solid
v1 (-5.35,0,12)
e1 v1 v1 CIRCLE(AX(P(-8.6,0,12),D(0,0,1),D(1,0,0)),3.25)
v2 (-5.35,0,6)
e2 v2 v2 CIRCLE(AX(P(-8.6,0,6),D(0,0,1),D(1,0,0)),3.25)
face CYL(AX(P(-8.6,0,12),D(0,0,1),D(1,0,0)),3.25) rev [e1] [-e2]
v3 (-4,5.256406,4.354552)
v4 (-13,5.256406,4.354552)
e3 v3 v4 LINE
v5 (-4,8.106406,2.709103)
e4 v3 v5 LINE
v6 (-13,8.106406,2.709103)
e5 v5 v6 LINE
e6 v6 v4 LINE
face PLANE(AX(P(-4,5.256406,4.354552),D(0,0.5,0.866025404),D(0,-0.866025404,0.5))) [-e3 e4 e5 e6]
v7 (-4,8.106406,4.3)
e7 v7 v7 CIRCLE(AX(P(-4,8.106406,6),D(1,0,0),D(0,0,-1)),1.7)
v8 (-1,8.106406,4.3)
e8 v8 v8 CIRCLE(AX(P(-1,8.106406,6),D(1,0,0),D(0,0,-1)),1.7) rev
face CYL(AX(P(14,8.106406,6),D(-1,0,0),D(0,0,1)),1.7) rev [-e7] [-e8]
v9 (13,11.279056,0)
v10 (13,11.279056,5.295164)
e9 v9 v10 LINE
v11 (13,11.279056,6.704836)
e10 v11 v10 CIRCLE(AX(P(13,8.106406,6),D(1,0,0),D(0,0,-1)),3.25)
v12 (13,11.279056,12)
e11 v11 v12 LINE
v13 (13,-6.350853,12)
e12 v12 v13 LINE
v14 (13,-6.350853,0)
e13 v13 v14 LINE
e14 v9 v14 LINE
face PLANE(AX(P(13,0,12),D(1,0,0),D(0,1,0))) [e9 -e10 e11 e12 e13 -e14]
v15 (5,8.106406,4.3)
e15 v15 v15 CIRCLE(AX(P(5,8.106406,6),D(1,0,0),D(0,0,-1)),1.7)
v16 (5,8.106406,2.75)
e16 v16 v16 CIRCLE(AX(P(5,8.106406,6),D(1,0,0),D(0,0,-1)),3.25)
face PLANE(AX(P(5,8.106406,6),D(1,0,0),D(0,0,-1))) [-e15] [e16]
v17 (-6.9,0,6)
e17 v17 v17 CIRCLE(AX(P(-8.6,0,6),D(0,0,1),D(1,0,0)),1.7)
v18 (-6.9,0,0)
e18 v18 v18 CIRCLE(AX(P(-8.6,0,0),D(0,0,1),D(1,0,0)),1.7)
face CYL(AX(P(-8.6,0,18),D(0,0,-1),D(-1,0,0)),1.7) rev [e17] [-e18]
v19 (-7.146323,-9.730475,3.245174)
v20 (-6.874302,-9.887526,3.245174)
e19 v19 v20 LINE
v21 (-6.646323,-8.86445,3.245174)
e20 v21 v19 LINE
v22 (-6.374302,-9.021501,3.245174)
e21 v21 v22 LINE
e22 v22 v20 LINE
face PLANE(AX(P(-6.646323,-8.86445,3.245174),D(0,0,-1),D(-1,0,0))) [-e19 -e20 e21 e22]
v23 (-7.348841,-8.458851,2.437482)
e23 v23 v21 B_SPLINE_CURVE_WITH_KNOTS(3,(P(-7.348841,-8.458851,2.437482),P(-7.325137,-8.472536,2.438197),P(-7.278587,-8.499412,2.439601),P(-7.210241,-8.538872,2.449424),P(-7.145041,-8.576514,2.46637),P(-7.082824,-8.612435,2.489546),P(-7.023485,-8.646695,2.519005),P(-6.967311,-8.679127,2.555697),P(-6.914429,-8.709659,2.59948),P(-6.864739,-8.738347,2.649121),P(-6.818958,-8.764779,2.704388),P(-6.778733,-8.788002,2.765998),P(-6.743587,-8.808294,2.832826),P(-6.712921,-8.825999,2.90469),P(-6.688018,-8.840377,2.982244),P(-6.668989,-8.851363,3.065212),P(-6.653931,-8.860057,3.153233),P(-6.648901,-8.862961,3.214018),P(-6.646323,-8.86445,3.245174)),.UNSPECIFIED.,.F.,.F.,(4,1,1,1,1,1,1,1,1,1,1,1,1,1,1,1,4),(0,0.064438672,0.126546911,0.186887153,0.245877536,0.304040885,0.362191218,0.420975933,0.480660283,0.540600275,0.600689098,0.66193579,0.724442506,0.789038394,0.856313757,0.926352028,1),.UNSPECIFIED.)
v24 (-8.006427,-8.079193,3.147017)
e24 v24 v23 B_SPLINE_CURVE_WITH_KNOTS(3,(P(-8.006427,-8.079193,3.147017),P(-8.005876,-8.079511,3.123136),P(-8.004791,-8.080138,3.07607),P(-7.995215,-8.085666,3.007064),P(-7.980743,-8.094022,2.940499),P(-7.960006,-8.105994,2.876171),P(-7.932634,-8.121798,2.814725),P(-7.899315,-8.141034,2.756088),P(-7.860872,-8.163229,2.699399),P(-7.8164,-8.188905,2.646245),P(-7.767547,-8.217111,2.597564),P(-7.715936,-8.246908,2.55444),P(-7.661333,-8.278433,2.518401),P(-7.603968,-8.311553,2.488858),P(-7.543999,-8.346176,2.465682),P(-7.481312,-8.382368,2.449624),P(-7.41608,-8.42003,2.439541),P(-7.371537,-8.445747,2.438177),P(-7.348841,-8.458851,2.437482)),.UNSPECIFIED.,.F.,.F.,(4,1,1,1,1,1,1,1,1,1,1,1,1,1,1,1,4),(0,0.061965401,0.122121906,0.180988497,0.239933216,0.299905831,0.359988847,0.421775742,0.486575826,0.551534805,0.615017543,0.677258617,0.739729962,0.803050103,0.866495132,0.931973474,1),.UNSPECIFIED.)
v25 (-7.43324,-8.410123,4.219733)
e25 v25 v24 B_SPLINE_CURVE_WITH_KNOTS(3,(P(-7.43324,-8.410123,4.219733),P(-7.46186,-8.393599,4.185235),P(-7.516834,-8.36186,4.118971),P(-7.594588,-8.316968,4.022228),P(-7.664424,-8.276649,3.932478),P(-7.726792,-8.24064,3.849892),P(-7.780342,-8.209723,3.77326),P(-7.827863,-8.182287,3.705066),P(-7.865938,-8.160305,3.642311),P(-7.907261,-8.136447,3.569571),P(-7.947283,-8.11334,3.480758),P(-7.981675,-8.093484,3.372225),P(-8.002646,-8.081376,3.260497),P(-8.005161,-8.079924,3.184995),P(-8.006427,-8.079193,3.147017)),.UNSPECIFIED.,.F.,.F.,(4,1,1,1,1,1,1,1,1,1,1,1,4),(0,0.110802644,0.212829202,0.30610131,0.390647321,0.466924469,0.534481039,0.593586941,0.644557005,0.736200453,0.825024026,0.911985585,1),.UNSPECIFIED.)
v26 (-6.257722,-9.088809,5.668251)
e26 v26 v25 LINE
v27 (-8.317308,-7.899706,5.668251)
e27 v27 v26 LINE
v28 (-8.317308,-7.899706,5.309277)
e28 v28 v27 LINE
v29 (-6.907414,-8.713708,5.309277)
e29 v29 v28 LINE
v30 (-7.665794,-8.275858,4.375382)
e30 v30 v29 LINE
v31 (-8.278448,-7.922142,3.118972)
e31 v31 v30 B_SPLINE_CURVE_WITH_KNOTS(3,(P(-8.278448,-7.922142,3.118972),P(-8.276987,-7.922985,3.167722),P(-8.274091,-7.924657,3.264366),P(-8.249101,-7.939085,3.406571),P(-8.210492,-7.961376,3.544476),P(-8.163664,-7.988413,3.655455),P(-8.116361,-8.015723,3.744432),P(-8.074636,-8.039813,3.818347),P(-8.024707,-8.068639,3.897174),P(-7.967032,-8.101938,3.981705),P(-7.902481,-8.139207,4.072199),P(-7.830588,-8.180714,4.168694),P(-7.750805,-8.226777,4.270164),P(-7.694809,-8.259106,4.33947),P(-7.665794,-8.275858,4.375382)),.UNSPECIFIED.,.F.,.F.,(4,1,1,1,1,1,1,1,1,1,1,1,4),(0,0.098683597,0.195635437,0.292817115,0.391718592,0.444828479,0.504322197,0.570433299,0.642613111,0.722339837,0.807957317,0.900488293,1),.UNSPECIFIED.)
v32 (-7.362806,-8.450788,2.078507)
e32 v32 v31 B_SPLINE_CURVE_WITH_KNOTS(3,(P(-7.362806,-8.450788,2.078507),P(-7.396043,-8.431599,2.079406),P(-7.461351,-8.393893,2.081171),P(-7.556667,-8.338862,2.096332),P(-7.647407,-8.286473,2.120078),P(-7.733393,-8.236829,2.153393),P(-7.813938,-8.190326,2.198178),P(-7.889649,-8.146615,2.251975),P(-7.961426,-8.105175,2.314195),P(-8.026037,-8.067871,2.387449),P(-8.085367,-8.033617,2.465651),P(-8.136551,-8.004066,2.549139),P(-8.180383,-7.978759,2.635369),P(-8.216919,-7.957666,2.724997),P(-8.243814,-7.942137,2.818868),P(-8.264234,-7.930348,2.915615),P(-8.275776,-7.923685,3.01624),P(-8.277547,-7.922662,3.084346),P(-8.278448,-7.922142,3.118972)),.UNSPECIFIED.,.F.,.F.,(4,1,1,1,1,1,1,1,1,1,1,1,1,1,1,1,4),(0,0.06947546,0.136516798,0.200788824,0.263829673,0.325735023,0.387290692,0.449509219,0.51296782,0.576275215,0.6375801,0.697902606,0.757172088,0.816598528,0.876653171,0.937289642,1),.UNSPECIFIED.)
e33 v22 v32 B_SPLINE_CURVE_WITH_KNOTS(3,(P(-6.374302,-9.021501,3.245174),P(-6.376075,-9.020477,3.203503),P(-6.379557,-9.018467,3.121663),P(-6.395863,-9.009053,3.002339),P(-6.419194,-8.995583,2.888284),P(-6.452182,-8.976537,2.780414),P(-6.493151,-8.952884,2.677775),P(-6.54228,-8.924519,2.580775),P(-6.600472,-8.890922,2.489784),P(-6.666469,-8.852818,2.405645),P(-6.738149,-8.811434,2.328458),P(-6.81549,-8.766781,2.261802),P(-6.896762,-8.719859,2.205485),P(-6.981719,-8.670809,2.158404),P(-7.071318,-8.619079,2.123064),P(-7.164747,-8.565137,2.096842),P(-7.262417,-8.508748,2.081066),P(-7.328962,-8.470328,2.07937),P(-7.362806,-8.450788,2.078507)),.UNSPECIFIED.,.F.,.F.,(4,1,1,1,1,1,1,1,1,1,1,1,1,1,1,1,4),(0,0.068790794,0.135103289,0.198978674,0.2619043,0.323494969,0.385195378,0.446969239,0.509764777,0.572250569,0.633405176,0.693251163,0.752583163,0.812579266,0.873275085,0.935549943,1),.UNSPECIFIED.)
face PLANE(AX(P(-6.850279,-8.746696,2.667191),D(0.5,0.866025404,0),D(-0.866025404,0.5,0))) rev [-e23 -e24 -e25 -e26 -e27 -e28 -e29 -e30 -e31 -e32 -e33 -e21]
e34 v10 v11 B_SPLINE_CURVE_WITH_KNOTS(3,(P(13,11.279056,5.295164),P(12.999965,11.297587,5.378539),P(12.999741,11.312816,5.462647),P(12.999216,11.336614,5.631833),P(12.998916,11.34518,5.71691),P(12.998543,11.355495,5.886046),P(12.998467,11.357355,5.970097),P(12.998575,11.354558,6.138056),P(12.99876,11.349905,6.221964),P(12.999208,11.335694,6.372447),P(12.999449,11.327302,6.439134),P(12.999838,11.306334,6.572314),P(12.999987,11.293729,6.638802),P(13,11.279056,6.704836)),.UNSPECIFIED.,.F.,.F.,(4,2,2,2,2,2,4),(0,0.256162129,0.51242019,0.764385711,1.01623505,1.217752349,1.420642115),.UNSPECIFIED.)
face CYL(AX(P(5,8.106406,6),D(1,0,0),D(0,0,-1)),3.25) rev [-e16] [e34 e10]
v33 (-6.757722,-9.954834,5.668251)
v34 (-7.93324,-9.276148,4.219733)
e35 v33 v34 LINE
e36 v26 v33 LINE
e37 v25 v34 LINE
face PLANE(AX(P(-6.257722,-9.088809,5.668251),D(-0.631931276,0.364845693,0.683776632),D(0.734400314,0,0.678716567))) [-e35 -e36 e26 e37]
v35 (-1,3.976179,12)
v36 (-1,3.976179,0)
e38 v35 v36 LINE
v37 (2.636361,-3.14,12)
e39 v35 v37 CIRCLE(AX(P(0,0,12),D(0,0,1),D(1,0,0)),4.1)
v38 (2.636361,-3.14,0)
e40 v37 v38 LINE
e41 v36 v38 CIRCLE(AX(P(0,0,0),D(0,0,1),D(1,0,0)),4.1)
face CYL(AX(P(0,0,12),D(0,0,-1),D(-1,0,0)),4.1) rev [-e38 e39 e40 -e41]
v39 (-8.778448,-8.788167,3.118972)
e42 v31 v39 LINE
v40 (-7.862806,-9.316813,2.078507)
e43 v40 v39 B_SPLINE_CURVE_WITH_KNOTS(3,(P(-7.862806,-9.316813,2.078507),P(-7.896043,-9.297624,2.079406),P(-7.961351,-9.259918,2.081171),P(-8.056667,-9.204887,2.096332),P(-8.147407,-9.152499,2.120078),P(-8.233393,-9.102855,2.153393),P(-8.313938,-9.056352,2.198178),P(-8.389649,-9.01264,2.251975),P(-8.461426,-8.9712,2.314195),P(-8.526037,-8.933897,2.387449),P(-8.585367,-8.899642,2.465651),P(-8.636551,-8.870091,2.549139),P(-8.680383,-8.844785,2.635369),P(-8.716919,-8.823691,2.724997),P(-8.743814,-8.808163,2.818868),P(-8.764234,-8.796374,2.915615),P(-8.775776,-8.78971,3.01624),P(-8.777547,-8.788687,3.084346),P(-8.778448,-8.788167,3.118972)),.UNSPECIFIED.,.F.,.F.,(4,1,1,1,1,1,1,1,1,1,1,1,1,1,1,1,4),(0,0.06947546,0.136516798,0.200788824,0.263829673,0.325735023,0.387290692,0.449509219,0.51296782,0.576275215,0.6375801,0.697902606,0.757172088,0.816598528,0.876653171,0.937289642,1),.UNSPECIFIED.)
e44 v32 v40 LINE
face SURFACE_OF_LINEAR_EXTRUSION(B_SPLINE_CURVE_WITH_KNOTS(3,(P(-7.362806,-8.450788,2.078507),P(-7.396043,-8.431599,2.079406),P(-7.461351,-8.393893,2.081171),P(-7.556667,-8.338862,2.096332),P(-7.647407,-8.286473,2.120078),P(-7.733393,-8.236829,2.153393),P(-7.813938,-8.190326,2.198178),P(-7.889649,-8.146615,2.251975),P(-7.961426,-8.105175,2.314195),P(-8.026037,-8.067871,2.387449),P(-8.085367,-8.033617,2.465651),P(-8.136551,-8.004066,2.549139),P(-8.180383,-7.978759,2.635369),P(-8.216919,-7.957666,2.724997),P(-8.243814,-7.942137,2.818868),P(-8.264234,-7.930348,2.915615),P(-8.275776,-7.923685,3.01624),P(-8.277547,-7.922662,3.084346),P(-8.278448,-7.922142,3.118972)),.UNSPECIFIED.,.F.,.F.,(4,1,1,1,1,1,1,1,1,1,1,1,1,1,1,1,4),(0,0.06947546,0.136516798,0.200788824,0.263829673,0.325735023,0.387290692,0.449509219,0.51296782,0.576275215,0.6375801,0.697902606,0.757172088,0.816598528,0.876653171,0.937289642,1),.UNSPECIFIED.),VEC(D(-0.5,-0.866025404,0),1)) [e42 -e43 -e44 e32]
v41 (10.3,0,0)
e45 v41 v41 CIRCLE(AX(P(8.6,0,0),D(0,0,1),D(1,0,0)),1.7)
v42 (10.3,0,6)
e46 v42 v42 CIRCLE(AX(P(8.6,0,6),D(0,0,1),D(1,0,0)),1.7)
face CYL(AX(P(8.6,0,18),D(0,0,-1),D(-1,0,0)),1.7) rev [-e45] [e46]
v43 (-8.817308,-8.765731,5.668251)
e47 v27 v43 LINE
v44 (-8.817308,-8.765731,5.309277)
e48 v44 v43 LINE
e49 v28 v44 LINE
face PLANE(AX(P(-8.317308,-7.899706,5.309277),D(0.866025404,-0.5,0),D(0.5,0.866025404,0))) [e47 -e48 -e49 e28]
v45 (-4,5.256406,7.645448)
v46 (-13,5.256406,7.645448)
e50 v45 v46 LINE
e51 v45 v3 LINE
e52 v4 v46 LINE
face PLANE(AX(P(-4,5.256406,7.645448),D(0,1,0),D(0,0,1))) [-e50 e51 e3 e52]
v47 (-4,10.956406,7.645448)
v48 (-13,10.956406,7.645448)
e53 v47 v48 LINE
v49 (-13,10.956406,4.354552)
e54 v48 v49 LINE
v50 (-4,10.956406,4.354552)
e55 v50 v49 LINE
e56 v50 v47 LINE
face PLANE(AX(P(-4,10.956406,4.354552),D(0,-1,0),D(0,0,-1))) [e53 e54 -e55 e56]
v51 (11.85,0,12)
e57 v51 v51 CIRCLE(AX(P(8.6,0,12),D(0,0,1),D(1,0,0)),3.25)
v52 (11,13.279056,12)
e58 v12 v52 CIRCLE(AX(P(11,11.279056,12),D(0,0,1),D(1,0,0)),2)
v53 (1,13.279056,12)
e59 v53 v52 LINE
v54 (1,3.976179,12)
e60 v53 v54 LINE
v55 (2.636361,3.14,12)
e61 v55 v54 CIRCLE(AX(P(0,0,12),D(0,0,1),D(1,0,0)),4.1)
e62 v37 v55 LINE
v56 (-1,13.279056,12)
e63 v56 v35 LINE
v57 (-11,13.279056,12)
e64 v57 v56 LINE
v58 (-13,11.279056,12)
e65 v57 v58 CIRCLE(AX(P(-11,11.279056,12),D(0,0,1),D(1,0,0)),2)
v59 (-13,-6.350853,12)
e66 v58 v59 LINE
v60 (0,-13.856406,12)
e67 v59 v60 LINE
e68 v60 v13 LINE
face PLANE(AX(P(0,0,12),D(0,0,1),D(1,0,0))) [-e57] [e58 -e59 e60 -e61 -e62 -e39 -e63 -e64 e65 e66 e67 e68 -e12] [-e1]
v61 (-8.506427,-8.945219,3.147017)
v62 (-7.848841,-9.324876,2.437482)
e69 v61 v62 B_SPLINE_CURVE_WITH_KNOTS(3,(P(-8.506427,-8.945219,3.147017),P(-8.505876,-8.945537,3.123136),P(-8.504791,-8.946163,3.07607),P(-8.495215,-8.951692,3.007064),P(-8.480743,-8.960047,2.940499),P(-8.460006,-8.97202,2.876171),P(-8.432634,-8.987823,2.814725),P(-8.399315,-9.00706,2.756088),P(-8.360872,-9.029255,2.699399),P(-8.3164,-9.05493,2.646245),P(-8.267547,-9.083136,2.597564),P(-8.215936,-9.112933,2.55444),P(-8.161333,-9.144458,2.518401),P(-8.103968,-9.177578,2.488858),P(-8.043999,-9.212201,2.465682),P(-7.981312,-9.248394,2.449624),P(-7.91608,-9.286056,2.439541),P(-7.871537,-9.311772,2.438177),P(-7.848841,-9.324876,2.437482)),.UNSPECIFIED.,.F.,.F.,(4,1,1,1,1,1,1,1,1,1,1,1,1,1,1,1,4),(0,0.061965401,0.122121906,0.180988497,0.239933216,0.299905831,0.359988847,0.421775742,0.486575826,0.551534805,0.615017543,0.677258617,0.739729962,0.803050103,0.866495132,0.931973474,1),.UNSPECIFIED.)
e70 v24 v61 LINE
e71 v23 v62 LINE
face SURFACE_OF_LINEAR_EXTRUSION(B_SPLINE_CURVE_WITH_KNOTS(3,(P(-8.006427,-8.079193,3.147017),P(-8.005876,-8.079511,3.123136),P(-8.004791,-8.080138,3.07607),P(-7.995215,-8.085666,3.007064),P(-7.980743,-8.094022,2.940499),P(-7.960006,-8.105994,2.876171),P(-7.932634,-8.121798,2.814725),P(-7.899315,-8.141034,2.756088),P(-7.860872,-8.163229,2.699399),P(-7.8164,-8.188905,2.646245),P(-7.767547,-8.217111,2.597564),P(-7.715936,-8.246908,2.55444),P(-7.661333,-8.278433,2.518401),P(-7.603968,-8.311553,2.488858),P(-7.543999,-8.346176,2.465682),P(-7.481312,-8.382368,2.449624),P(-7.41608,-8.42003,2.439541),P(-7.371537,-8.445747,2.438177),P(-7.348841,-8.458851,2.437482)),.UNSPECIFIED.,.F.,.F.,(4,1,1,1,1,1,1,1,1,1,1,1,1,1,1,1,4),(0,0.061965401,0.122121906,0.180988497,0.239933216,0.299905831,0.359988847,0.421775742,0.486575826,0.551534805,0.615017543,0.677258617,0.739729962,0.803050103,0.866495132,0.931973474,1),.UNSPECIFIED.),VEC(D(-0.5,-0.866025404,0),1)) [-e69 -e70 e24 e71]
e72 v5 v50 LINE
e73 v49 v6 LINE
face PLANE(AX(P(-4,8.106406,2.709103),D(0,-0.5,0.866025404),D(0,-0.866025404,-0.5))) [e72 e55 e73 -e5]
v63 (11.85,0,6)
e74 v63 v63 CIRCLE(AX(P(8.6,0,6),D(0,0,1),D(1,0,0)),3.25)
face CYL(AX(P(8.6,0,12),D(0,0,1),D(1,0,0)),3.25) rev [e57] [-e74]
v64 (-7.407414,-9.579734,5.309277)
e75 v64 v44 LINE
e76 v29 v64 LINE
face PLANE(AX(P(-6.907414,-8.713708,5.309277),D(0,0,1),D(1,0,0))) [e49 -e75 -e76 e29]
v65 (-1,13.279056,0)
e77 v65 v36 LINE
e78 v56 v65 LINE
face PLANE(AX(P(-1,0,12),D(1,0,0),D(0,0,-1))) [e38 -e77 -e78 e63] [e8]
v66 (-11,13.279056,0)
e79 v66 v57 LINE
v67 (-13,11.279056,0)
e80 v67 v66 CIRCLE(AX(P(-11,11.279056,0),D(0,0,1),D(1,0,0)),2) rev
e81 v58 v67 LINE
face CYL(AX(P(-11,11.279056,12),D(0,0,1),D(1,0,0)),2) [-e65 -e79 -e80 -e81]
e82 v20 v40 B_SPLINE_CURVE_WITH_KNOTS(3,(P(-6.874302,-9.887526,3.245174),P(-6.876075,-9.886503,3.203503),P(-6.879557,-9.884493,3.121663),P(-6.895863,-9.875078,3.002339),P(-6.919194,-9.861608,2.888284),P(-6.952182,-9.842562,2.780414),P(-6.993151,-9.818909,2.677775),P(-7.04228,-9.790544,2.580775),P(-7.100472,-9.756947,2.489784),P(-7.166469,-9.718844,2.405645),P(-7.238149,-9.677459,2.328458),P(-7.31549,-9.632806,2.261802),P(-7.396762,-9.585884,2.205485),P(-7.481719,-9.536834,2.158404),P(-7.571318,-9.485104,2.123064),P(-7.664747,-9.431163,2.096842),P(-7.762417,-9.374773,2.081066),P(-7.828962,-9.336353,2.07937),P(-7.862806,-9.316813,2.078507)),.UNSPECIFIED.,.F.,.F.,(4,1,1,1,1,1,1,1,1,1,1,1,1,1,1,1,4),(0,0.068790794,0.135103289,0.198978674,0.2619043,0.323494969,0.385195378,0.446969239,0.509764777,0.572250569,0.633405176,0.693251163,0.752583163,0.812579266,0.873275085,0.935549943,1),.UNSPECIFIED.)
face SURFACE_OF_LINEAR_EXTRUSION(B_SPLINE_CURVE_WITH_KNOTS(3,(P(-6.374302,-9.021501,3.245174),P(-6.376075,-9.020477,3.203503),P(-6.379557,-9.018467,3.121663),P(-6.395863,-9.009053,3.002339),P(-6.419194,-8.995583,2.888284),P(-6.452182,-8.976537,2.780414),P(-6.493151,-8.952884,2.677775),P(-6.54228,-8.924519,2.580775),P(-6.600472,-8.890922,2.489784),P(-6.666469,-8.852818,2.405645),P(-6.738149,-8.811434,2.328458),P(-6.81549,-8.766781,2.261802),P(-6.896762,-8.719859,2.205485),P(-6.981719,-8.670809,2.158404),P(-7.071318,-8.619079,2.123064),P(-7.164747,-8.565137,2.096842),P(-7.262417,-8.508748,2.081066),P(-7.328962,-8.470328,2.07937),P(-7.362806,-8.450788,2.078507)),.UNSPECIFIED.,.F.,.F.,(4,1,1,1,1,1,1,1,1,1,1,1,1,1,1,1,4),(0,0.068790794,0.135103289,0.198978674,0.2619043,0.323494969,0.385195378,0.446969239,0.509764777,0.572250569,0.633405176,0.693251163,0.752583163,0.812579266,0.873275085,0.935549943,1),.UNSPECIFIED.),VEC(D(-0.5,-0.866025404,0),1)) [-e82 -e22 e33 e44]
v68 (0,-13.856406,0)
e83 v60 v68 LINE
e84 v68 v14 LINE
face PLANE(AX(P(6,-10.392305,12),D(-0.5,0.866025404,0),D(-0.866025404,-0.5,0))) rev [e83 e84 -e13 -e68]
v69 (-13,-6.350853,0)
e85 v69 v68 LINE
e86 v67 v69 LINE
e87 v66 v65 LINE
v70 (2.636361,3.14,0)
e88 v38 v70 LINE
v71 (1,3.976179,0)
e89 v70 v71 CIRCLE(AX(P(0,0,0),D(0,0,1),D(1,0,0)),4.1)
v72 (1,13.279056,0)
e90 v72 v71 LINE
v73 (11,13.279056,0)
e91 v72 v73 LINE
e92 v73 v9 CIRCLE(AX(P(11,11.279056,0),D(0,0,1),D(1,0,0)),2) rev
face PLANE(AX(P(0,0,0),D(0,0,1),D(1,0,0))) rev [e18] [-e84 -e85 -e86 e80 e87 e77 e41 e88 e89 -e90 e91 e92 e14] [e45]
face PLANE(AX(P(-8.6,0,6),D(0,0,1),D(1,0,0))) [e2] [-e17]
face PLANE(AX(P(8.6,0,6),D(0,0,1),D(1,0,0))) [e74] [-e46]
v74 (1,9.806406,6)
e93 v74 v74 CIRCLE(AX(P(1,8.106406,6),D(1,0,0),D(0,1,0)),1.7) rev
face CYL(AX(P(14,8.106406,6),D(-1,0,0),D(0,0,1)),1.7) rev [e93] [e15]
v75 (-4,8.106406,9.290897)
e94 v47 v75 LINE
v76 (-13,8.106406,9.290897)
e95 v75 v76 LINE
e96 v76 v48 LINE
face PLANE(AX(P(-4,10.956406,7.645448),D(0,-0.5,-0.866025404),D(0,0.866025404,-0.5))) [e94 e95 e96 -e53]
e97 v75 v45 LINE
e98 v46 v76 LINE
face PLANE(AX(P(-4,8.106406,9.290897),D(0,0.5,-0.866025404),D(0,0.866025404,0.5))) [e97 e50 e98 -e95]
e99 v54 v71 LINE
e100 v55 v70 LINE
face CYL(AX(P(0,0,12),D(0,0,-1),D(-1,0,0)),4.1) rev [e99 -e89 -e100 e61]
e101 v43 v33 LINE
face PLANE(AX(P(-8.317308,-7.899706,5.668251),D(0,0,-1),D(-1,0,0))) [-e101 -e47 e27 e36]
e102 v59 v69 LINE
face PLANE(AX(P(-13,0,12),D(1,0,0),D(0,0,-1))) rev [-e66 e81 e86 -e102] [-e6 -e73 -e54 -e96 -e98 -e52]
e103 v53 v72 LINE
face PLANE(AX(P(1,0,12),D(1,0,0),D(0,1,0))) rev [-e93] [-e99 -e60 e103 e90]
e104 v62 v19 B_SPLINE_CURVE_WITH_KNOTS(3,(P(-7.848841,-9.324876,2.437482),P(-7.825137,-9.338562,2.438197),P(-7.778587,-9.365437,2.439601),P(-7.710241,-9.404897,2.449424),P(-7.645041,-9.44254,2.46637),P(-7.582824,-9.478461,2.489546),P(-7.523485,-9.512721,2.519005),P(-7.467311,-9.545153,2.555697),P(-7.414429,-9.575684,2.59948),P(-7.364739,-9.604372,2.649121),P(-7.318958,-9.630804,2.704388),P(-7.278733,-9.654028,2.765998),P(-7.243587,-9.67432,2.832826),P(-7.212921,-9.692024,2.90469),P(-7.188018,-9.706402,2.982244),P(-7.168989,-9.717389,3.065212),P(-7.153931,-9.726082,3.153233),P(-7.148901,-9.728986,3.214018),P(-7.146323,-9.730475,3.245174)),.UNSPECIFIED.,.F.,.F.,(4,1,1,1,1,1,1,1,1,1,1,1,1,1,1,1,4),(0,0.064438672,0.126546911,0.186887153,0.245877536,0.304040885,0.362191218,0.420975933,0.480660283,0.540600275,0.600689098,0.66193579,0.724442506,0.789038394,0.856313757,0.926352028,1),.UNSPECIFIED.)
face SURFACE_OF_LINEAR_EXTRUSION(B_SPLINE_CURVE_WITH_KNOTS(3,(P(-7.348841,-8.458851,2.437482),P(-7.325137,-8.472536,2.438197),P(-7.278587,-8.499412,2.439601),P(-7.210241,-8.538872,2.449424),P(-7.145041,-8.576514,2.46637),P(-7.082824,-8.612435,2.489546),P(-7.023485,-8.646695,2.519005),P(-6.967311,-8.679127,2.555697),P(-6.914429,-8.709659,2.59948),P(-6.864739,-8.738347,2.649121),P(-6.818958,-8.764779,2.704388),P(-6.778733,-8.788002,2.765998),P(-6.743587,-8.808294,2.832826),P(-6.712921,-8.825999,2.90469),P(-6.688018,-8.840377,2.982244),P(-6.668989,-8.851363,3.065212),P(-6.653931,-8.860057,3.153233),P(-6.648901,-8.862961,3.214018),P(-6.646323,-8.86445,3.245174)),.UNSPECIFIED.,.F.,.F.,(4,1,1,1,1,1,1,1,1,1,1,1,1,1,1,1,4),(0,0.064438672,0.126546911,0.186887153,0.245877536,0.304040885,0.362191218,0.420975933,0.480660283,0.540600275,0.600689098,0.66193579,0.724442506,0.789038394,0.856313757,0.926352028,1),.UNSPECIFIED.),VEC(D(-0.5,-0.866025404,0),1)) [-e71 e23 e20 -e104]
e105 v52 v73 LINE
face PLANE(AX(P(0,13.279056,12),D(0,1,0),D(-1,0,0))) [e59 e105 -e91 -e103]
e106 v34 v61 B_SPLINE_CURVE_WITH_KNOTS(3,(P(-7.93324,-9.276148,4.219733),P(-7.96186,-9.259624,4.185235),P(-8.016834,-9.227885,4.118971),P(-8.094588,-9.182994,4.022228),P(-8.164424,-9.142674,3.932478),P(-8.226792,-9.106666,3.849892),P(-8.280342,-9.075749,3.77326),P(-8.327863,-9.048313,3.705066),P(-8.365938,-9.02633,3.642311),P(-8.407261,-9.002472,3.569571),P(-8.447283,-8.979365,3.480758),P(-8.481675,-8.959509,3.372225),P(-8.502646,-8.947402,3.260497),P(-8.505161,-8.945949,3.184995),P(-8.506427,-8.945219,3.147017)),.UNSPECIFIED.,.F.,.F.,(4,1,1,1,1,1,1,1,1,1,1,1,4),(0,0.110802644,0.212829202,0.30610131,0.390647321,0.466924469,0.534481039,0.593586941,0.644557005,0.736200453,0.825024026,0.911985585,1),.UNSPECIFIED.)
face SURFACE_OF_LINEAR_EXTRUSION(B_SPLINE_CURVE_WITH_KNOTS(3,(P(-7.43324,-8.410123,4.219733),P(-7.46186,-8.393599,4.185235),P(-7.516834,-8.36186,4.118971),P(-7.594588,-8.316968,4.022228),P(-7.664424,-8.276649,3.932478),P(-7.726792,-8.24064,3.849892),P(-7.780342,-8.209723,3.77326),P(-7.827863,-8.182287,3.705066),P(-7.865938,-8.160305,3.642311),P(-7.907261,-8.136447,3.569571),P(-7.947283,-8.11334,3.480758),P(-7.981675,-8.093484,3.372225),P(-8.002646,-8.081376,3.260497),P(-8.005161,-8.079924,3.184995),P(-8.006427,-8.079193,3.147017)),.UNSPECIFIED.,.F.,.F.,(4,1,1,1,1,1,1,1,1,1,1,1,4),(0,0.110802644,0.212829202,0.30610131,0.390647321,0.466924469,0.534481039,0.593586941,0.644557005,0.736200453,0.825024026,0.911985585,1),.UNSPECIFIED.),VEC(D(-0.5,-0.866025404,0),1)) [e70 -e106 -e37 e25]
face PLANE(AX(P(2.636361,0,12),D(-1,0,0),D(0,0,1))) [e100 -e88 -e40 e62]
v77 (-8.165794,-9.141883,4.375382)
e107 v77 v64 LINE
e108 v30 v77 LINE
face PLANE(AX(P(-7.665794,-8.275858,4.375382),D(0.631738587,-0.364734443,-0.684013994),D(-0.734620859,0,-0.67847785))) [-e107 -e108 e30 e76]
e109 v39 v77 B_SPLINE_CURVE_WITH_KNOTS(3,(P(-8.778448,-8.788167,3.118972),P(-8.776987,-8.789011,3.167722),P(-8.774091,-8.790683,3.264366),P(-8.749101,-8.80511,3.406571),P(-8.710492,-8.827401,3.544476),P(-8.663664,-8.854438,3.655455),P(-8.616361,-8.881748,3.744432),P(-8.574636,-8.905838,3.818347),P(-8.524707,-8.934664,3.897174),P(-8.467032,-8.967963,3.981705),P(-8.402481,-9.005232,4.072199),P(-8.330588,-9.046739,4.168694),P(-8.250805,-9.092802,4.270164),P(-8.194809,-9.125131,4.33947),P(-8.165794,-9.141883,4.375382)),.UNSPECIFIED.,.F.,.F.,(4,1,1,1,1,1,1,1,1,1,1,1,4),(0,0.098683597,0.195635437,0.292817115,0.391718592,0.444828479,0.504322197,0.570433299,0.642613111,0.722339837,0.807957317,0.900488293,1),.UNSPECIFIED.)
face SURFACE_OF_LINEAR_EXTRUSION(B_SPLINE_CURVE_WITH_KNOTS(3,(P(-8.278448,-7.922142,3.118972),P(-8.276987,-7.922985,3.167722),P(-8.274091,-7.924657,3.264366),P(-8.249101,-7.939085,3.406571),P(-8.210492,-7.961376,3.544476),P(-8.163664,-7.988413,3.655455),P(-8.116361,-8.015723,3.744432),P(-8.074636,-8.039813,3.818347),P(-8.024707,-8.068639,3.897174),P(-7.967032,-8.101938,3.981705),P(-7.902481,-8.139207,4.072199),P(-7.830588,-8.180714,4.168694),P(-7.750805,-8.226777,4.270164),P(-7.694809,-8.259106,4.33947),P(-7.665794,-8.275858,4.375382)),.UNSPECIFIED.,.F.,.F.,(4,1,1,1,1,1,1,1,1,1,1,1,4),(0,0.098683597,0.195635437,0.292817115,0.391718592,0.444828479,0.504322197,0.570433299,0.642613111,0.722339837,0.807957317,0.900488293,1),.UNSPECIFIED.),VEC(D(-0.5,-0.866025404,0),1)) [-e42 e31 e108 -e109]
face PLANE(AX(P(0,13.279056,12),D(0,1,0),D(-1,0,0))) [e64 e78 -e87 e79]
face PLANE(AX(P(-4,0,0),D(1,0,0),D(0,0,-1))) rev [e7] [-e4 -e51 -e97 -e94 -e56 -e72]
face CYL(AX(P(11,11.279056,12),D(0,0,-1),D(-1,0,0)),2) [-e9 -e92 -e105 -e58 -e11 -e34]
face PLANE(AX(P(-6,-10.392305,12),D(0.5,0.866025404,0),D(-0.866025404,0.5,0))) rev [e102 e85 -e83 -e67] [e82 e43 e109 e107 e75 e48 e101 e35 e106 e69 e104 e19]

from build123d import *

# Parameters (mm, degrees)
BOSS_EXTRUDE1_DEPTH            = 12
SKETCH41_R                     = 1.7
CUT_EXTRUDE7_DEPTH             = 18
CBORE_FOR_M3_SHCS1_D           = 3.4
CBORE_FOR_M3_SHCS1_CBORE_D     = 6.5
CBORE_FOR_M3_SHCS1_CBORE_DEPTH = 3
F_3DSKETCH3_START              = 9
F_3DSKETCH3_OUTLINE_R          = 3.25
F_3DSKETCH3_OUTLINE_R_2        = 1.7
F_3DSKETCH3_DEPTH              = 3
CUT_EXTRUDE10_DEPTH            = 15
CUT_EXTRUDE10_DEPTH_BACK       = 15
SKETCH52_R                     = 1.7
SKETCH58_R                     = 3.25
CUT_EXTRUDE11_DEPTH            = 8
CUT_EXTRUDE12_DEPTH            = 4
CUT_EXTRUDE12_DEPTH_BACK       = 6
FILLET1_R                      = 2
SKETCH61_R                     = 3.25
CUT_EXTRUDE13_DEPTH            = 6
CUT_EXTRUDE14_DEPTH            = 1


# Read off the part's stored shape, not the designer's step: 3DSketch3
with BuildPart() as part:
    # Sketch1 → Boss-Extrude1 (new body)
    with BuildSketch(Plane(origin=(0, 0, 0), x_dir=(0, 1, 0), z_dir=(0, 0, 1))):
        with BuildLine():
            Line((-6.350852961, -13), (13.279056191, -13))
            Line((13.279056191, -13), (13.279056191, -1))
            Line((13.279056191, -1), (3.97617907, -1))
            ThreePointArc((3.97617907, -1), (3.650947901, -1.865631106), (3.14, -2.636361129))
            Line((3.14, -2.636361129), (-3.14, -2.636361129))
            ThreePointArc((-3.14, -2.636361129), (-3.852531635, -1.402854233), (-4.1, 0))
            ThreePointArc((-4.1, 0), (-0.503818326, 4.06892702), (3.97617907, 1))
            Line((3.97617907, 1), (13.279056191, 1))
            Line((13.279056191, 1), (13.279056191, 13))
            Line((13.279056191, 13), (-6.350852961, 13))
            Line((-6.350852961, 13), (-13.856406461, 0))
            Line((-13.856406461, 0), (-6.350852961, -13))
        make_face()
    extrude(amount=BOSS_EXTRUDE1_DEPTH)

    # Sketch41 → Cut-Extrude7 (cut)
    with BuildSketch(Plane(origin=(0, 0, 0), x_dir=(0, 1, 0), z_dir=(0, 0, 1))):
        with Locations(Location((0, 8.6, 0), (0, 0, 270))):
            Circle(SKETCH41_R)
        with Locations(Location((0, -8.6, 0), (0, 0, 270))):
            Circle(SKETCH41_R)
    extrude(amount=CUT_EXTRUDE7_DEPTH, mode=Mode.SUBTRACT)

    # CBORE for M3 SHCS1 (through all)
    with Locations(Plane(origin=(-8.6, 0, 12), x_dir=(1, 0, 0), z_dir=(0, 0, 1))):
        with Locations((0, 0)):
            CounterBoreHole(CBORE_FOR_M3_SHCS1_D / 2, CBORE_FOR_M3_SHCS1_CBORE_D / 2, CBORE_FOR_M3_SHCS1_CBORE_DEPTH)

    # 3DSketch3 outline → 3DSketch3 (cut)
    with BuildSketch(Plane.XY.offset(F_3DSKETCH3_START)):
        with Locations((8.6, 0)):
            Circle(F_3DSKETCH3_OUTLINE_R)
        with Locations((8.6, 0)):
            Circle(F_3DSKETCH3_OUTLINE_R_2, mode=Mode.SUBTRACT)
    extrude(amount=F_3DSKETCH3_DEPTH, mode=Mode.SUBTRACT)

    # Sketch52 → Cut-Extrude10 (cut, two sides: drawn at the far end of the back side and taken through both)
    with BuildSketch(Plane.YZ.offset(-1).offset(-CUT_EXTRUDE10_DEPTH_BACK)):
        with Locations((8.106406461, 6)):
            Circle(SKETCH52_R)
    extrude(amount=CUT_EXTRUDE10_DEPTH + CUT_EXTRUDE10_DEPTH_BACK, mode=Mode.SUBTRACT)

    # Sketch58 → Cut-Extrude11 (cut)
    with BuildSketch(Plane.YZ.offset(13)):
        with Locations(Location((8.106406461, 6, 0), (0, 0, 270))):
            Circle(SKETCH58_R)
    extrude(amount=-CUT_EXTRUDE11_DEPTH, mode=Mode.SUBTRACT)

    # Sketch60 → Cut-Extrude12 (cut, two sides: drawn at the far end of the back side and taken through both)
    with BuildSketch(Plane.YZ.offset(-8).offset(-CUT_EXTRUDE12_DEPTH_BACK)):
        Polygon((8.106406461, 2.709103466), (10.956406461, 4.354551733), (10.956406461, 7.645448267), (8.106406461, 9.290896534), (5.256406461, 7.645448267), (5.256406461, 4.354551733), align=None)
    extrude(amount=CUT_EXTRUDE12_DEPTH + CUT_EXTRUDE12_DEPTH_BACK, mode=Mode.SUBTRACT)

    # Fillet1
    # the kernel refuses this fillet: 2 mm, written as the material it takes off along each edge
    with BuildSketch(Plane(origin=(13, 13.279056191, -5), x_dir=(0, -1, 0), z_dir=(0, 0, 1)), Plane(origin=(-13, 13.279056191, -5), x_dir=(1, 0, 0), z_dir=(0, 0, 1))) as fillet1_piece_1:
        with BuildLine():
            CenterArc((FILLET1_R, -FILLET1_R), FILLET1_R, 90, 90)
            Line((0, -FILLET1_R), (0, 0))
            Line((0, 0), (FILLET1_R, 0))
        make_face()
    extrude(amount=22, mode=Mode.SUBTRACT)

    # Sketch61 → Cut-Extrude13 (cut)
    with BuildSketch(Plane(origin=(0, 0, 12), x_dir=(0, 1, 0), z_dir=(0, 0, 1))):
        with Locations(Location((0, 8.6, 0), (0, 0, 270))):
            Circle(SKETCH61_R)
        with Locations(Location((0, -8.6, 0), (0, 0, 270))):
            Circle(SKETCH61_R)
    extrude(amount=-CUT_EXTRUDE13_DEPTH, mode=Mode.SUBTRACT)

    # Sketch62 → Cut-Extrude14 (cut)
    with BuildSketch(Plane(origin=(-6, -10.392304845, 0), x_dir=(-0.8660254037844386, 0.5000000000000001, 0), z_dir=(-0.5000000000000001, -0.8660254037844386, 0))):
        with BuildLine():
            Line((1.32365953, -3.245174166), (1.009556966, -3.245174166))
            add(Edge.make_bspline(
                [(1.009556966, -3.245174166), (1.011604119, -3.203503278), (1.015624673, -3.121662763), (1.034452962, -3.002338857), (1.061393839, -2.888284058), (1.099485293, -2.780414144), (1.146791571, -2.677775337), (1.203521598, -2.580775321), (1.270715449, -2.489784132), (1.346922183, -2.405645289), (1.429690822, -2.328457718), (1.518996761, -2.261802476), (1.612841789, -2.205484804), (1.710941188, -2.158403562), (1.814401751, -2.123063716), (1.922284609, -2.096842077), (2.035063745, -2.081065731), (2.111903767, -2.079369946), (2.150983248, -2.078507499)],
                knots=[0, 0, 0, 0, 1.10065271, 2.161652631, 3.183658789, 4.190468796, 5.17591951, 6.163126047, 7.15150782, 8.156236427, 9.156009102, 10.134482811, 11.092018607, 12.041330605, 13.001268258, 13.972401359, 14.968799086, 16, 16, 16, 16], degree=3))
            add(Edge.make_bspline(
                [(2.150983248, -2.078507499), (2.189361322, -2.079405955), (2.264772866, -2.08117139), (2.374834881, -2.096332419), (2.479612175, -2.120078011), (2.578899942, -2.153393427), (2.671906006, -2.198177855), (2.759329051, -2.251975393), (2.842209862, -2.314195225), (2.916816645, -2.387449038), (2.985324725, -2.465651423), (3.04442698, -2.549139326), (3.095040143, -2.635368612), (3.137227823, -2.724996814), (3.168283962, -2.818867842), (3.19186217, -2.915615045), (3.205189584, -3.016239856), (3.207235007, -3.084346411), (3.208274914, -3.118972242)],
                knots=[0, 0, 0, 0, 1.111607364, 2.184268762, 3.212621178, 4.221274766, 5.211760367, 6.196651075, 7.1921475, 8.207485113, 9.220403448, 10.201281604, 11.166441695, 12.114753415, 13.065576456, 14.026450734, 14.996634279, 16, 16, 16, 16], degree=3))
            add(Edge.make_bspline(
                [(3.208274914, -3.118972242), (3.206588269, -3.167722052), (3.203244578, -3.26436618), (3.174388875, -3.406570537), (3.129806778, -3.544475597), (3.075733749, -3.655454649), (3.021113181, -3.744431542), (2.972933386, -3.818347183), (2.915281033, -3.8971736), (2.84868362, -3.981704709), (2.774145813, -4.072199079), (2.691131146, -4.168693845), (2.599005455, -4.27016415), (2.534347273, -4.339469963), (2.500843023, -4.375382499)],
                knots=[0, 0, 0, 0, 1.184203166, 2.347625244, 3.513805382, 4.700623107, 5.337941753, 6.051866363, 6.845199593, 7.711357327, 8.668078039, 9.695487809, 10.805859518, 12, 12, 12, 12], degree=3))
            Line((2.500843023, -4.375382499), (1.625141902, -5.30927673))
            Line((1.625141902, -5.30927673), (3.253146709, -5.30927673))
            Line((3.253146709, -5.30927673), (3.253146709, -5.668251089))
            Line((3.253146709, -5.668251089), (0.874941581, -5.668251089))
            Line((0.874941581, -5.668251089), (2.232313376, -4.21973346))
            add(Edge.make_bspline(
                [(2.232313376, -4.21973346), (2.265361263, -4.185235154), (2.32883949, -4.118970967), (2.418622067, -4.022228007), (2.499261055, -3.932478466), (2.571278448, -3.849891918), (2.633111953, -3.77326035), (2.687984185, -3.705065647), (2.731949776, -3.642311196), (2.779665172, -3.569570582), (2.825879153, -3.480758265), (2.865591509, -3.372224576), (2.889806358, -3.260497323), (2.892711193, -3.184995286), (2.89417235, -3.147017114)],
                knots=[0, 0, 0, 0, 1.329631726, 2.553950428, 3.673215718, 4.687767853, 5.603093632, 6.413772471, 7.123043292, 7.734684054, 8.834405432, 9.900288307, 10.943827018, 12, 12, 12, 12], degree=3))
            add(Edge.make_bspline(
                [(2.89417235, -3.147017114), (2.893536608, -3.123135716), (2.892283682, -3.076070065), (2.881225984, -3.007064306), (2.864515478, -2.940499493), (2.84057022, -2.876170874), (2.80896348, -2.814725221), (2.7704901, -2.756087741), (2.726100037, -2.699398776), (2.674748768, -2.646245478), (2.618337248, -2.597564273), (2.558742998, -2.554440187), (2.495692894, -2.518401076), (2.429452772, -2.488857579), (2.360207302, -2.465682198), (2.287822557, -2.449623619), (2.212498541, -2.439541135), (2.161065045, -2.438176963), (2.134857446, -2.437481858)],
                knots=[0, 0, 0, 0, 0.991446411, 1.95395049, 2.89581595, 3.838931463, 4.798493298, 5.75982156, 6.748411868, 7.785213223, 8.824556874, 9.840280684, 10.836137867, 11.835679398, 12.848801643, 13.863922112, 14.911575587, 16, 16, 16, 16], degree=3))
            add(Edge.make_bspline(
                [(2.134857446, -2.437481858), (2.107486614, -2.43819689), (2.053734817, -2.439601095), (1.974815784, -2.449423759), (1.899530007, -2.4663696), (1.827688104, -2.489546274), (1.759168518, -2.519004823), (1.694304474, -2.555696568), (1.633241585, -2.599480061), (1.575865062, -2.649120617), (1.523001082, -2.704388218), (1.476554207, -2.765998181), (1.435970192, -2.832825597), (1.400560959, -2.904690147), (1.371805269, -2.982243927), (1.349832118, -3.065211632), (1.332445272, -3.153233014), (1.326636751, -3.214018099), (1.32365953, -3.245174166)],
                knots=[0, 0, 0, 0, 1.031018746, 2.02475058, 2.990194455, 3.934040569, 4.864654155, 5.795059489, 6.735614925, 7.690564532, 8.649604399, 9.611025574, 10.590972636, 11.591080095, 12.624614302, 13.701020113, 14.821632451, 16, 16, 16, 16], degree=3))
        make_face()
    extrude(amount=-CUT_EXTRUDE14_DEPTH, mode=Mode.SUBTRACT)


solid = part.part
